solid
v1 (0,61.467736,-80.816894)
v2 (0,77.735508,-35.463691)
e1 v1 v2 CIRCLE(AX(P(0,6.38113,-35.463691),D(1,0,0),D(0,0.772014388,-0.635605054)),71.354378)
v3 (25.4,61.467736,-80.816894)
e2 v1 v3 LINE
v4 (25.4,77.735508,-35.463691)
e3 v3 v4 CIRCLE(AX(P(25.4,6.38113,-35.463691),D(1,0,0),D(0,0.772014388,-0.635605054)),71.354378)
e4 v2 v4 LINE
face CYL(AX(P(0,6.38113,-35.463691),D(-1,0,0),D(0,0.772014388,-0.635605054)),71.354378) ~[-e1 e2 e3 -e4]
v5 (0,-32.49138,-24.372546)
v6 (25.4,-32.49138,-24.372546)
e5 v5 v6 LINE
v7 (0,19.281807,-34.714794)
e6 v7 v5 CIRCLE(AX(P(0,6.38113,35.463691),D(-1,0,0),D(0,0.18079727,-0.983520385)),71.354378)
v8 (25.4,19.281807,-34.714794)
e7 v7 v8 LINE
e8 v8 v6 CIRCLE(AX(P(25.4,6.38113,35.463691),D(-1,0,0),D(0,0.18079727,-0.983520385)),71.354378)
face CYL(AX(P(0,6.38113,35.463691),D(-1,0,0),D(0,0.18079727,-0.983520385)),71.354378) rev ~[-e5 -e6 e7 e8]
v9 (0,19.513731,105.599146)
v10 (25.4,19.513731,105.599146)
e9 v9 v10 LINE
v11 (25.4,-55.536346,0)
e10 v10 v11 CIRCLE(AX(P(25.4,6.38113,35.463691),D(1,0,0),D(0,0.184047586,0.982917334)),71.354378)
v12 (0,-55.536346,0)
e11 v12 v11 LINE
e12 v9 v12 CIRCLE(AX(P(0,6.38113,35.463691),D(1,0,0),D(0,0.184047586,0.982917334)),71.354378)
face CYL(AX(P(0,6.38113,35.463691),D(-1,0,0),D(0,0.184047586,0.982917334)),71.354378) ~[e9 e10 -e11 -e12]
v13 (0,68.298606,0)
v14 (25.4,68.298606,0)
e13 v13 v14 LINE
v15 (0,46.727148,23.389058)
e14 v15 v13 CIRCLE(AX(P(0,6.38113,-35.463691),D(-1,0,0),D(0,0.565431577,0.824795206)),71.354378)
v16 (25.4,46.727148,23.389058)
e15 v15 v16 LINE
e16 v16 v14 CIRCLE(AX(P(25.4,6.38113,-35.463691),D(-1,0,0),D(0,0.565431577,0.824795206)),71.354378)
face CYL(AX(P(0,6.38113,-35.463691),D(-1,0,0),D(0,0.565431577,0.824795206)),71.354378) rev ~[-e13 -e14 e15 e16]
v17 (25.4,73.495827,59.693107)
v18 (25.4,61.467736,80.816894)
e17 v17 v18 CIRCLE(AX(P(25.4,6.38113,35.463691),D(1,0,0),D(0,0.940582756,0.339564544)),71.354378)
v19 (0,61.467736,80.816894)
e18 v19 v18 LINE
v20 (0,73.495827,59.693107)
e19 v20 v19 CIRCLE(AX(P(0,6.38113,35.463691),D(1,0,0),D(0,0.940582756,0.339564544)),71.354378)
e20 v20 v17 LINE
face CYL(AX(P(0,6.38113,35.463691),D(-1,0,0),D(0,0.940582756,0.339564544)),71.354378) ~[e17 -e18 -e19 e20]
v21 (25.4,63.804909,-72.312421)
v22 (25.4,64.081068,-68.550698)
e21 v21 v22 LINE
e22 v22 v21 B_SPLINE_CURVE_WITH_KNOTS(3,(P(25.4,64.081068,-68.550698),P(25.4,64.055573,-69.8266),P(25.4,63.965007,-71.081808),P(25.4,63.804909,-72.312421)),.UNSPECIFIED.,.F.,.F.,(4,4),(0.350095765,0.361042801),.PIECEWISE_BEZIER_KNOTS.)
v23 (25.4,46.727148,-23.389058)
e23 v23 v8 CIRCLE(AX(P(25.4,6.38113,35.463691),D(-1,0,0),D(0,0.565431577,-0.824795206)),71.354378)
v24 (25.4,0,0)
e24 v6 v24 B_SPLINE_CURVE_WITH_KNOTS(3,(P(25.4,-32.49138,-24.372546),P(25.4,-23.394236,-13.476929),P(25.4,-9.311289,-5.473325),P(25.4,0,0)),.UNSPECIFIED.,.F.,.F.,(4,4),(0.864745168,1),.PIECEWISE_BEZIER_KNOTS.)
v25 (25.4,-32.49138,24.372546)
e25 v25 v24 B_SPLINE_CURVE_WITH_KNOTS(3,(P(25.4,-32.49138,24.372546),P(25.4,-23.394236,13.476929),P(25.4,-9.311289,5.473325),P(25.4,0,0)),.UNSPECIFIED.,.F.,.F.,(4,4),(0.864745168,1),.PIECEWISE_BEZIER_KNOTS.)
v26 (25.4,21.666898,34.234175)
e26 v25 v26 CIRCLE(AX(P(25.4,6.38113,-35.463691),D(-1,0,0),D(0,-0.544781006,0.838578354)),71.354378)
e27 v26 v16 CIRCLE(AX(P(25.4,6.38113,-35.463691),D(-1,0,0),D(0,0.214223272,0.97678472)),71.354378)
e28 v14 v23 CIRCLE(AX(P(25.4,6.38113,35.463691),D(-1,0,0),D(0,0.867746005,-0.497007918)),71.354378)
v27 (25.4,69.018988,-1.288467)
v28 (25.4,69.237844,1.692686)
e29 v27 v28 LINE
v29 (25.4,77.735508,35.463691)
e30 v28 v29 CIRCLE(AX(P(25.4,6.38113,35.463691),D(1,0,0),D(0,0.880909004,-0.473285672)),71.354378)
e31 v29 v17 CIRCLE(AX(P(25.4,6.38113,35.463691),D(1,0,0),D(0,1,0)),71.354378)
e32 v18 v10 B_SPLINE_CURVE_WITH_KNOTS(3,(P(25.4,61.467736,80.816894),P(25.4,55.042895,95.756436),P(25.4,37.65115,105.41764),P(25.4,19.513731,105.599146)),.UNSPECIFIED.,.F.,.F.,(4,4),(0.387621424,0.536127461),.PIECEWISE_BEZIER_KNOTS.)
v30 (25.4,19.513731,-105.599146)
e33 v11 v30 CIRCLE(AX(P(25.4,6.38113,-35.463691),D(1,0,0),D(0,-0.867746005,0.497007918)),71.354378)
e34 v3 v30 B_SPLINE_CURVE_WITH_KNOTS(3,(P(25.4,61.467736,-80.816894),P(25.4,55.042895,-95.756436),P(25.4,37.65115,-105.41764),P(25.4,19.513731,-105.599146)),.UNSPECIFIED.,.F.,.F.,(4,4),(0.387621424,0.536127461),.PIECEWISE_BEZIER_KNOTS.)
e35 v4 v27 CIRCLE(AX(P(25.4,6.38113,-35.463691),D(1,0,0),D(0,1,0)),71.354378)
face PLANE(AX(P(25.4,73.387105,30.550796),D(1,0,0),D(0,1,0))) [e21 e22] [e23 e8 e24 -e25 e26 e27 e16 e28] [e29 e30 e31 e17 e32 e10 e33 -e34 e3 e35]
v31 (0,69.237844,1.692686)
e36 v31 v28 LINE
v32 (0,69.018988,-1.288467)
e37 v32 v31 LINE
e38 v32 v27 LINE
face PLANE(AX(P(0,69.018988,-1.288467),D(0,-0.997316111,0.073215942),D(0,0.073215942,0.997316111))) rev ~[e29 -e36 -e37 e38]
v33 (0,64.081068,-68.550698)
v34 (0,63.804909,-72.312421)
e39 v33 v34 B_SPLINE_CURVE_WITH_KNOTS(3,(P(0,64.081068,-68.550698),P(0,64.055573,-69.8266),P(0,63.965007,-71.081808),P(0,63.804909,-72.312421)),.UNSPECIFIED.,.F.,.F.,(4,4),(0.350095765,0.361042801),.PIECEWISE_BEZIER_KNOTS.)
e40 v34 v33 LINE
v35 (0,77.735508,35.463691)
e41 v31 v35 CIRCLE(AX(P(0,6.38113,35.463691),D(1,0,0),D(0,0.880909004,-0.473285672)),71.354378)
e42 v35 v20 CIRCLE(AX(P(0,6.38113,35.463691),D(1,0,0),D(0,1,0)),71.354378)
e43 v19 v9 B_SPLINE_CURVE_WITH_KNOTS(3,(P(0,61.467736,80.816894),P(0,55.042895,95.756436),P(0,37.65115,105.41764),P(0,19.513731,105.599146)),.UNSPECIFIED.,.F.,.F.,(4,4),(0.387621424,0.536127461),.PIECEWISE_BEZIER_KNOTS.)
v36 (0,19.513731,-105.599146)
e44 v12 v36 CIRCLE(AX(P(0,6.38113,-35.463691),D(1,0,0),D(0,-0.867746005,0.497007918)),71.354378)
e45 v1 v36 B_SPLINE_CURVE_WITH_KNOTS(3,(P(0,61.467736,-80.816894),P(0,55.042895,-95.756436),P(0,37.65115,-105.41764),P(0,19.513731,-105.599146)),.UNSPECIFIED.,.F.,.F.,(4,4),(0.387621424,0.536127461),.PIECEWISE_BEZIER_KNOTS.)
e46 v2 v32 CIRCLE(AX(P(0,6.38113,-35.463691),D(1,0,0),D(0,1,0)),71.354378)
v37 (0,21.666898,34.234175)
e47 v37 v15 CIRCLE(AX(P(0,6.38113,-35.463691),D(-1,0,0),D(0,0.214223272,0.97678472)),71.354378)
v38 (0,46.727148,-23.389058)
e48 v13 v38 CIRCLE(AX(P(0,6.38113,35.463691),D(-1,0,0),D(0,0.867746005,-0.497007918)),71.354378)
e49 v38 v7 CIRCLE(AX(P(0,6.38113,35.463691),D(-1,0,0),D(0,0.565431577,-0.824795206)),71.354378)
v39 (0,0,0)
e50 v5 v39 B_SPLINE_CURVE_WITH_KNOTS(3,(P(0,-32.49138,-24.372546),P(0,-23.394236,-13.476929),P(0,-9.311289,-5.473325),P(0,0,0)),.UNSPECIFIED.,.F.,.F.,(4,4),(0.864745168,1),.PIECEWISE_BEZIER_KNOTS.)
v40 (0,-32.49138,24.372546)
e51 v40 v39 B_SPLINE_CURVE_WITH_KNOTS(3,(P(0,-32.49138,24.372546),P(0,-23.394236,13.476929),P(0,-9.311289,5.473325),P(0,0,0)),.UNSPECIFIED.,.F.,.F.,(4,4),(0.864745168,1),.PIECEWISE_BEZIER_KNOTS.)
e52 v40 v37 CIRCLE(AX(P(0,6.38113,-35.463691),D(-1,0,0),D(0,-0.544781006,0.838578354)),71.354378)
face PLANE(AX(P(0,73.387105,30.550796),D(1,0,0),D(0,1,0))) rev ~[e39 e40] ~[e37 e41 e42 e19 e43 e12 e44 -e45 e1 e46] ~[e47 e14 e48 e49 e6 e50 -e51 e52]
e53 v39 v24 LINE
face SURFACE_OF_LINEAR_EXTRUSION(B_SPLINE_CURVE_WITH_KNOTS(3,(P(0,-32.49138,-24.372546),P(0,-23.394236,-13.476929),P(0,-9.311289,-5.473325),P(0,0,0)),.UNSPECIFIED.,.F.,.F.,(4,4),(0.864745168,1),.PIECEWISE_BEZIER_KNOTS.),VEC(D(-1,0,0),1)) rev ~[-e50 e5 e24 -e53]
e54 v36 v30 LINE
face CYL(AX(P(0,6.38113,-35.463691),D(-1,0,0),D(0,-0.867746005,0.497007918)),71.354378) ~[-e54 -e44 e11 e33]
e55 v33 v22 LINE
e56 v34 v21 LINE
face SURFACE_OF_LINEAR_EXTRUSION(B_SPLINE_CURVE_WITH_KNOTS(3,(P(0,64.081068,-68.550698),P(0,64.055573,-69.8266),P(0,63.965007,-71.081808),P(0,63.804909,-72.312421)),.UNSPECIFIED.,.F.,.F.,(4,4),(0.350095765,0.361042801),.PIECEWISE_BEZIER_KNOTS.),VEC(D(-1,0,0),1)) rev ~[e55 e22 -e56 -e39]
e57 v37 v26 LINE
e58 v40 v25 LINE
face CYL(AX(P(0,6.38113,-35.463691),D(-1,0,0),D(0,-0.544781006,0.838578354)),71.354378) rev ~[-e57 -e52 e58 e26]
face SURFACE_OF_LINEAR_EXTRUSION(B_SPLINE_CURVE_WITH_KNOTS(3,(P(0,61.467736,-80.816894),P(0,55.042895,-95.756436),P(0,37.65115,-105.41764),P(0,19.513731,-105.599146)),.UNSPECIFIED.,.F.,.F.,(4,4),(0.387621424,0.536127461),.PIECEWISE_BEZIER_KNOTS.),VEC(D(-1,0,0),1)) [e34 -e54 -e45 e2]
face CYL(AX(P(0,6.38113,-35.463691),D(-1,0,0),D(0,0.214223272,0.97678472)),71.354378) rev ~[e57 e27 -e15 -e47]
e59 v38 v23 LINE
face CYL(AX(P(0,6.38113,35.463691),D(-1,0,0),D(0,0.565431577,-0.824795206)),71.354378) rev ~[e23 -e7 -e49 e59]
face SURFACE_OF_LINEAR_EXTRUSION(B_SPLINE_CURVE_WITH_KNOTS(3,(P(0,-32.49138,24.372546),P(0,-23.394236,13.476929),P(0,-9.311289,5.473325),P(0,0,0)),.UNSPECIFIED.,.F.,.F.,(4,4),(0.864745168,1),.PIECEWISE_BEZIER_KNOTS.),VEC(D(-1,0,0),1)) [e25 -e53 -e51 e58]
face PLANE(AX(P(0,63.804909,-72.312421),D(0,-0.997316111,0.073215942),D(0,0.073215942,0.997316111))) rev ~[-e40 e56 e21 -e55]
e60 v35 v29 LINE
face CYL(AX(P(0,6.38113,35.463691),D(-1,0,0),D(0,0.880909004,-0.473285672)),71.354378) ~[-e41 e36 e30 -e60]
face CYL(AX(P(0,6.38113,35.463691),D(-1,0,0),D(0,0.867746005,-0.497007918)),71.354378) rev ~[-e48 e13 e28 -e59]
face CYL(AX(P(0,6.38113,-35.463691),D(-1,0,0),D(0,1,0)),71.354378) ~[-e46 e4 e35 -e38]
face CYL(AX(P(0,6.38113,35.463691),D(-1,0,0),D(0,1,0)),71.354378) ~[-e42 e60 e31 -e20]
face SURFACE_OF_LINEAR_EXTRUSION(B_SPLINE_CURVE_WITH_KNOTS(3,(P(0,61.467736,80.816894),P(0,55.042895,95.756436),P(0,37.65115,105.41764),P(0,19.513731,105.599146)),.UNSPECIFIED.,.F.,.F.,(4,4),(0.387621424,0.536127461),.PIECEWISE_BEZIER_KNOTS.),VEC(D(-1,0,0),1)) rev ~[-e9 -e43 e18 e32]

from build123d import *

# Parameters (mm, degrees)
F1_DEPTH = 25.4


with BuildPart() as f1:
    # F0 (on Right) → F1 (new body)
    with BuildSketch(Plane.YZ):
        with BuildLine():
            ThreePointArc((77.7355076163, 35.4636907578), (76.6675961502, 47.7624663657), (73.4958271318, 59.6931074906))
            Line((73.4958271318, 59.6931074906), (69.2378436874, 1.6926861527))
            ThreePointArc((69.2378436874, 1.6926861527), (75.5784886533, 18.0518338473), (77.7355076163, 35.4636907578))
        make_face()
        with BuildLine():
            Line((69.2378436874, 1.6926861527), (73.4958271318, 59.6931074906))
            ThreePointArc((73.4958271318, 59.6931074906), (68.3879297776, 70.7709703077), (61.4677361542, 80.8168938687))
            add(Edge.make_bspline(
                [(46.7271482261, 23.3890579279), (57.3671713501, 38.6358972227), (67.4277924366, 61.0196278452), (62.6176115866, 78.1431138882), (61.4677361542, 80.8168938687)],
                knots=[0.2275291842, 0.2275291842, 0.2275291842, 0.2275291842, 0.3610428006, 0.3876214238, 0.3876214238, 0.3876214238, 0.3876214238], degree=3))
            ThreePointArc((46.7271482261, 23.3890579279), (58.8331802448, 12.9122292433), (68.2986060932, 0))
            ThreePointArc((68.2986060932, 0), (68.7739653696, 0.8431577995), (69.2378436874, 1.6926861527))
        make_face()
        with BuildLine():
            Line((69.0189883561, -1.2884671556), (69.2378436874, 1.6926861527))
            ThreePointArc((69.2378436874, 1.6926861527), (68.7739653696, 0.8431577995), (68.2986060932, 0))
            ThreePointArc((68.2986060932, 0), (68.6621292842, -0.6423706226), (69.0189883561, -1.2884671556))
        make_face()
        with BuildLine():
            add(Edge.make_bspline(
                [(46.7271482261, 23.3890579279), (57.3671713501, 38.6358972227), (67.4277924366, 61.0196278452), (62.6176115866, 78.1431138882), (61.4677361542, 80.8168938687)],
                knots=[0.2275291842, 0.2275291842, 0.2275291842, 0.2275291842, 0.3610428006, 0.3876214238, 0.3876214238, 0.3876214238, 0.3876214238], degree=3))
            ThreePointArc((61.4677361542, 80.8168938687), (42.6716941747, 96.9001796523), (19.5137307938, 105.5991455529))
            add(Edge.make_bspline(
                [(19.5137307938, 105.5991455529), (15.2484459589, 105.6418292249), (-17.4670589129, 101.9834872227), (-51.4356414133, 56.0713753865), (-36.7498246069, 29.4728703431), (-32.4913798704, 24.3725458831)],
                knots=[0.5361274609, 0.5361274609, 0.5361274609, 0.5361274609, 0.5710508717, 0.8014313121, 0.8647451677, 0.8647451677, 0.8647451677, 0.8647451677], degree=3))
            ThreePointArc((-32.4913798704, 24.3725458831), (-6.4015352071, 34.736385461), (21.6668981331, 34.2341751698))
            ThreePointArc((21.6668981331, 34.2341751698), (34.7206440257, 30.0215683701), (46.7271482261, 23.3890579279))
        make_face()
        with BuildLine():
            ThreePointArc((19.5137307938, 105.5991455529), (42.6716941747, 96.9001796523), (61.4677361542, 80.8168938687))
            add(Edge.make_bspline(
                [(61.4677361542, 80.8168938687), (55.0428945656, 95.7564363048), (37.6511501332, 105.4176402871), (19.5137307938, 105.5991455529)],
                knots=[0.3876214238, 0.3876214238, 0.3876214238, 0.3876214238, 0.5361274609, 0.5361274609, 0.5361274609, 0.5361274609], degree=3))
        make_face()
        with BuildLine():
            ThreePointArc((77.7355076163, -35.4636907578), (75.5220462625, -17.829040093), (69.0189883561, -1.2884671556))
            Line((69.0189883561, -1.2884671556), (64.0810679537, -68.550697648))
            add(Edge.make_bspline(
                [(64.0810679537, -68.550697648), (64.055573163, -69.8265995508), (63.9650070893, -71.0818079643), (63.8049086741, -72.3124207221)],
                knots=[0.3500957655, 0.3500957655, 0.3500957655, 0.3500957655, 0.3610428006, 0.3610428006, 0.3610428006, 0.3610428006], degree=3))
            add(Edge.make_bspline(
                [(63.8049086741, -72.3124207221), (63.4162011029, -75.3002610177), (62.6176115866, -78.1431138882), (61.4677361542, -80.8168938687)],
                knots=[0.3610428006, 0.3610428006, 0.3610428006, 0.3610428006, 0.3876214238, 0.3876214238, 0.3876214238, 0.3876214238], degree=3))
            ThreePointArc((61.4677361542, -80.8168938687), (73.5455465545, -59.5549413519), (77.7355076163, -35.4636907578))
        make_face()
        with BuildLine():
            Line((64.0810679537, -68.550697648), (69.0189883561, -1.2884671556))
            ThreePointArc((69.0189883561, -1.2884671556), (68.6621292842, -0.6423706226), (68.2986060932, 0))
            ThreePointArc((68.2986060932, 0), (58.8331802447, -12.9122292433), (46.7271482261, -23.3890579279))
            add(Edge.make_bspline(
                [(46.7271482261, -23.3890579279), (56.4947756325, -37.3857798919), (64.3665159576, -54.2652831945), (64.0810679537, -68.550697648)],
                knots=[0.2275291842, 0.2275291842, 0.2275291842, 0.2275291842, 0.3500957655, 0.3500957655, 0.3500957655, 0.3500957655], degree=3))
        make_face()
        with BuildLine():
            add(Edge.make_bspline(
                [(19.5137307938, 105.5991455529), (15.2484459589, 105.6418292249), (-17.4670589129, 101.9834872227), (-51.4356414133, 56.0713753865), (-36.7498246069, 29.4728703431), (-32.4913798704, 24.3725458831)],
                knots=[0.5361274609, 0.5361274609, 0.5361274609, 0.5361274609, 0.5710508717, 0.8014313121, 0.8647451677, 0.8647451677, 0.8647451677, 0.8647451677], degree=3))
            ThreePointArc((19.5137307938, 105.5991455529), (-51.7805921013, 76.7996475885), (-55.5363464012, 0))
            ThreePointArc((-55.5363464012, 0), (-45.4663442086, 13.5596369664), (-32.4913798704, 24.3725458831))
        make_face()
        with BuildLine():
            Line((63.8049086741, -72.3124207222), (64.0810679537, -68.550697648))
            add(Edge.make_bspline(
                [(46.7271482261, -23.3890579279), (56.4947756325, -37.3857798919), (64.3665159576, -54.2652831945), (64.0810679537, -68.550697648)],
                knots=[0.2275291842, 0.2275291842, 0.2275291842, 0.2275291842, 0.3500957655, 0.3500957655, 0.3500957655, 0.3500957655], degree=3))
            ThreePointArc((46.7271482261, -23.3890579279), (33.6000701349, -30.4952094493), (19.2818065466, -34.7147943189))
            ThreePointArc((19.2818065466, -34.7147943189), (-7.5965149208, -34.5082512887), (-32.4913798704, -24.3725458831))
            add(Edge.make_bspline(
                [(19.5137307938, -105.5991455529), (15.2484459589, -105.6418292249), (-17.4670589129, -101.9834872227), (-51.4356414133, -56.0713753865), (-36.7498246069, -29.4728703431), (-32.4913798704, -24.3725458831)],
                knots=[0.5361274609, 0.5361274609, 0.5361274609, 0.5361274609, 0.5710508717, 0.8014313121, 0.8647451677, 0.8647451677, 0.8647451677, 0.8647451677], degree=3))
            ThreePointArc((19.5137307938, -105.5991455529), (42.6716941747, -96.9001796523), (61.4677361542, -80.8168938687))
            add(Edge.make_bspline(
                [(63.8049086741, -72.3124207221), (63.4162011029, -75.3002610177), (62.6176115866, -78.1431138882), (61.4677361542, -80.8168938687)],
                knots=[0.3610428006, 0.3610428006, 0.3610428006, 0.3610428006, 0.3876214238, 0.3876214238, 0.3876214238, 0.3876214238], degree=3))
        make_face()
        with BuildLine():
            ThreePointArc((-32.4913798704, 24.3725458831), (-45.4663442086, 13.5596369664), (-55.5363464012, 0))
            ThreePointArc((-55.5363464012, 0), (-45.4663442086, -13.5596369664), (-32.4913798704, -24.3725458831))
            add(Edge.make_bspline(
                [(-32.4913798704, -24.3725458831), (-23.3942363951, -13.4769287613), (-9.3112886841, -5.4733246177), (0, 0)],
                knots=[0.8647451677, 0.8647451677, 0.8647451677, 0.8647451677, 1, 1, 1, 1], degree=3))
            add(Edge.make_bspline(
                [(-32.4913798704, 24.3725458831), (-23.3942363951, 13.4769287613), (-9.3112886841, 5.4733246177), (0, 0)],
                knots=[0.8647451677, 0.8647451677, 0.8647451677, 0.8647451677, 1, 1, 1, 1], degree=3))
        make_face()
        with BuildLine():
            ThreePointArc((-32.4913798704, -24.3725458831), (-45.4663442086, -13.5596369664), (-55.5363464012, 0))
            ThreePointArc((-55.5363464012, 0), (-51.7805921013, -76.7996475885), (19.5137307938, -105.5991455529))
            add(Edge.make_bspline(
                [(19.5137307938, -105.5991455529), (15.2484459589, -105.6418292249), (-17.4670589129, -101.9834872227), (-51.4356414133, -56.0713753865), (-36.7498246069, -29.4728703431), (-32.4913798704, -24.3725458831)],
                knots=[0.5361274609, 0.5361274609, 0.5361274609, 0.5361274609, 0.5710508717, 0.8014313121, 0.8647451677, 0.8647451677, 0.8647451677, 0.8647451677], degree=3))
        make_face()
        with BuildLine():
            add(Edge.make_bspline(
                [(61.4677361542, -80.8168938687), (55.0428945656, -95.7564363048), (37.6511501332, -105.4176402871), (19.5137307938, -105.5991455529)],
                knots=[0.3876214238, 0.3876214238, 0.3876214238, 0.3876214238, 0.5361274609, 0.5361274609, 0.5361274609, 0.5361274609], degree=3))
            ThreePointArc((61.4677361542, -80.8168938687), (42.6716941747, -96.9001796523), (19.5137307938, -105.5991455529))
        make_face()
    extrude(amount=F1_DEPTH)


solid = f1.part
